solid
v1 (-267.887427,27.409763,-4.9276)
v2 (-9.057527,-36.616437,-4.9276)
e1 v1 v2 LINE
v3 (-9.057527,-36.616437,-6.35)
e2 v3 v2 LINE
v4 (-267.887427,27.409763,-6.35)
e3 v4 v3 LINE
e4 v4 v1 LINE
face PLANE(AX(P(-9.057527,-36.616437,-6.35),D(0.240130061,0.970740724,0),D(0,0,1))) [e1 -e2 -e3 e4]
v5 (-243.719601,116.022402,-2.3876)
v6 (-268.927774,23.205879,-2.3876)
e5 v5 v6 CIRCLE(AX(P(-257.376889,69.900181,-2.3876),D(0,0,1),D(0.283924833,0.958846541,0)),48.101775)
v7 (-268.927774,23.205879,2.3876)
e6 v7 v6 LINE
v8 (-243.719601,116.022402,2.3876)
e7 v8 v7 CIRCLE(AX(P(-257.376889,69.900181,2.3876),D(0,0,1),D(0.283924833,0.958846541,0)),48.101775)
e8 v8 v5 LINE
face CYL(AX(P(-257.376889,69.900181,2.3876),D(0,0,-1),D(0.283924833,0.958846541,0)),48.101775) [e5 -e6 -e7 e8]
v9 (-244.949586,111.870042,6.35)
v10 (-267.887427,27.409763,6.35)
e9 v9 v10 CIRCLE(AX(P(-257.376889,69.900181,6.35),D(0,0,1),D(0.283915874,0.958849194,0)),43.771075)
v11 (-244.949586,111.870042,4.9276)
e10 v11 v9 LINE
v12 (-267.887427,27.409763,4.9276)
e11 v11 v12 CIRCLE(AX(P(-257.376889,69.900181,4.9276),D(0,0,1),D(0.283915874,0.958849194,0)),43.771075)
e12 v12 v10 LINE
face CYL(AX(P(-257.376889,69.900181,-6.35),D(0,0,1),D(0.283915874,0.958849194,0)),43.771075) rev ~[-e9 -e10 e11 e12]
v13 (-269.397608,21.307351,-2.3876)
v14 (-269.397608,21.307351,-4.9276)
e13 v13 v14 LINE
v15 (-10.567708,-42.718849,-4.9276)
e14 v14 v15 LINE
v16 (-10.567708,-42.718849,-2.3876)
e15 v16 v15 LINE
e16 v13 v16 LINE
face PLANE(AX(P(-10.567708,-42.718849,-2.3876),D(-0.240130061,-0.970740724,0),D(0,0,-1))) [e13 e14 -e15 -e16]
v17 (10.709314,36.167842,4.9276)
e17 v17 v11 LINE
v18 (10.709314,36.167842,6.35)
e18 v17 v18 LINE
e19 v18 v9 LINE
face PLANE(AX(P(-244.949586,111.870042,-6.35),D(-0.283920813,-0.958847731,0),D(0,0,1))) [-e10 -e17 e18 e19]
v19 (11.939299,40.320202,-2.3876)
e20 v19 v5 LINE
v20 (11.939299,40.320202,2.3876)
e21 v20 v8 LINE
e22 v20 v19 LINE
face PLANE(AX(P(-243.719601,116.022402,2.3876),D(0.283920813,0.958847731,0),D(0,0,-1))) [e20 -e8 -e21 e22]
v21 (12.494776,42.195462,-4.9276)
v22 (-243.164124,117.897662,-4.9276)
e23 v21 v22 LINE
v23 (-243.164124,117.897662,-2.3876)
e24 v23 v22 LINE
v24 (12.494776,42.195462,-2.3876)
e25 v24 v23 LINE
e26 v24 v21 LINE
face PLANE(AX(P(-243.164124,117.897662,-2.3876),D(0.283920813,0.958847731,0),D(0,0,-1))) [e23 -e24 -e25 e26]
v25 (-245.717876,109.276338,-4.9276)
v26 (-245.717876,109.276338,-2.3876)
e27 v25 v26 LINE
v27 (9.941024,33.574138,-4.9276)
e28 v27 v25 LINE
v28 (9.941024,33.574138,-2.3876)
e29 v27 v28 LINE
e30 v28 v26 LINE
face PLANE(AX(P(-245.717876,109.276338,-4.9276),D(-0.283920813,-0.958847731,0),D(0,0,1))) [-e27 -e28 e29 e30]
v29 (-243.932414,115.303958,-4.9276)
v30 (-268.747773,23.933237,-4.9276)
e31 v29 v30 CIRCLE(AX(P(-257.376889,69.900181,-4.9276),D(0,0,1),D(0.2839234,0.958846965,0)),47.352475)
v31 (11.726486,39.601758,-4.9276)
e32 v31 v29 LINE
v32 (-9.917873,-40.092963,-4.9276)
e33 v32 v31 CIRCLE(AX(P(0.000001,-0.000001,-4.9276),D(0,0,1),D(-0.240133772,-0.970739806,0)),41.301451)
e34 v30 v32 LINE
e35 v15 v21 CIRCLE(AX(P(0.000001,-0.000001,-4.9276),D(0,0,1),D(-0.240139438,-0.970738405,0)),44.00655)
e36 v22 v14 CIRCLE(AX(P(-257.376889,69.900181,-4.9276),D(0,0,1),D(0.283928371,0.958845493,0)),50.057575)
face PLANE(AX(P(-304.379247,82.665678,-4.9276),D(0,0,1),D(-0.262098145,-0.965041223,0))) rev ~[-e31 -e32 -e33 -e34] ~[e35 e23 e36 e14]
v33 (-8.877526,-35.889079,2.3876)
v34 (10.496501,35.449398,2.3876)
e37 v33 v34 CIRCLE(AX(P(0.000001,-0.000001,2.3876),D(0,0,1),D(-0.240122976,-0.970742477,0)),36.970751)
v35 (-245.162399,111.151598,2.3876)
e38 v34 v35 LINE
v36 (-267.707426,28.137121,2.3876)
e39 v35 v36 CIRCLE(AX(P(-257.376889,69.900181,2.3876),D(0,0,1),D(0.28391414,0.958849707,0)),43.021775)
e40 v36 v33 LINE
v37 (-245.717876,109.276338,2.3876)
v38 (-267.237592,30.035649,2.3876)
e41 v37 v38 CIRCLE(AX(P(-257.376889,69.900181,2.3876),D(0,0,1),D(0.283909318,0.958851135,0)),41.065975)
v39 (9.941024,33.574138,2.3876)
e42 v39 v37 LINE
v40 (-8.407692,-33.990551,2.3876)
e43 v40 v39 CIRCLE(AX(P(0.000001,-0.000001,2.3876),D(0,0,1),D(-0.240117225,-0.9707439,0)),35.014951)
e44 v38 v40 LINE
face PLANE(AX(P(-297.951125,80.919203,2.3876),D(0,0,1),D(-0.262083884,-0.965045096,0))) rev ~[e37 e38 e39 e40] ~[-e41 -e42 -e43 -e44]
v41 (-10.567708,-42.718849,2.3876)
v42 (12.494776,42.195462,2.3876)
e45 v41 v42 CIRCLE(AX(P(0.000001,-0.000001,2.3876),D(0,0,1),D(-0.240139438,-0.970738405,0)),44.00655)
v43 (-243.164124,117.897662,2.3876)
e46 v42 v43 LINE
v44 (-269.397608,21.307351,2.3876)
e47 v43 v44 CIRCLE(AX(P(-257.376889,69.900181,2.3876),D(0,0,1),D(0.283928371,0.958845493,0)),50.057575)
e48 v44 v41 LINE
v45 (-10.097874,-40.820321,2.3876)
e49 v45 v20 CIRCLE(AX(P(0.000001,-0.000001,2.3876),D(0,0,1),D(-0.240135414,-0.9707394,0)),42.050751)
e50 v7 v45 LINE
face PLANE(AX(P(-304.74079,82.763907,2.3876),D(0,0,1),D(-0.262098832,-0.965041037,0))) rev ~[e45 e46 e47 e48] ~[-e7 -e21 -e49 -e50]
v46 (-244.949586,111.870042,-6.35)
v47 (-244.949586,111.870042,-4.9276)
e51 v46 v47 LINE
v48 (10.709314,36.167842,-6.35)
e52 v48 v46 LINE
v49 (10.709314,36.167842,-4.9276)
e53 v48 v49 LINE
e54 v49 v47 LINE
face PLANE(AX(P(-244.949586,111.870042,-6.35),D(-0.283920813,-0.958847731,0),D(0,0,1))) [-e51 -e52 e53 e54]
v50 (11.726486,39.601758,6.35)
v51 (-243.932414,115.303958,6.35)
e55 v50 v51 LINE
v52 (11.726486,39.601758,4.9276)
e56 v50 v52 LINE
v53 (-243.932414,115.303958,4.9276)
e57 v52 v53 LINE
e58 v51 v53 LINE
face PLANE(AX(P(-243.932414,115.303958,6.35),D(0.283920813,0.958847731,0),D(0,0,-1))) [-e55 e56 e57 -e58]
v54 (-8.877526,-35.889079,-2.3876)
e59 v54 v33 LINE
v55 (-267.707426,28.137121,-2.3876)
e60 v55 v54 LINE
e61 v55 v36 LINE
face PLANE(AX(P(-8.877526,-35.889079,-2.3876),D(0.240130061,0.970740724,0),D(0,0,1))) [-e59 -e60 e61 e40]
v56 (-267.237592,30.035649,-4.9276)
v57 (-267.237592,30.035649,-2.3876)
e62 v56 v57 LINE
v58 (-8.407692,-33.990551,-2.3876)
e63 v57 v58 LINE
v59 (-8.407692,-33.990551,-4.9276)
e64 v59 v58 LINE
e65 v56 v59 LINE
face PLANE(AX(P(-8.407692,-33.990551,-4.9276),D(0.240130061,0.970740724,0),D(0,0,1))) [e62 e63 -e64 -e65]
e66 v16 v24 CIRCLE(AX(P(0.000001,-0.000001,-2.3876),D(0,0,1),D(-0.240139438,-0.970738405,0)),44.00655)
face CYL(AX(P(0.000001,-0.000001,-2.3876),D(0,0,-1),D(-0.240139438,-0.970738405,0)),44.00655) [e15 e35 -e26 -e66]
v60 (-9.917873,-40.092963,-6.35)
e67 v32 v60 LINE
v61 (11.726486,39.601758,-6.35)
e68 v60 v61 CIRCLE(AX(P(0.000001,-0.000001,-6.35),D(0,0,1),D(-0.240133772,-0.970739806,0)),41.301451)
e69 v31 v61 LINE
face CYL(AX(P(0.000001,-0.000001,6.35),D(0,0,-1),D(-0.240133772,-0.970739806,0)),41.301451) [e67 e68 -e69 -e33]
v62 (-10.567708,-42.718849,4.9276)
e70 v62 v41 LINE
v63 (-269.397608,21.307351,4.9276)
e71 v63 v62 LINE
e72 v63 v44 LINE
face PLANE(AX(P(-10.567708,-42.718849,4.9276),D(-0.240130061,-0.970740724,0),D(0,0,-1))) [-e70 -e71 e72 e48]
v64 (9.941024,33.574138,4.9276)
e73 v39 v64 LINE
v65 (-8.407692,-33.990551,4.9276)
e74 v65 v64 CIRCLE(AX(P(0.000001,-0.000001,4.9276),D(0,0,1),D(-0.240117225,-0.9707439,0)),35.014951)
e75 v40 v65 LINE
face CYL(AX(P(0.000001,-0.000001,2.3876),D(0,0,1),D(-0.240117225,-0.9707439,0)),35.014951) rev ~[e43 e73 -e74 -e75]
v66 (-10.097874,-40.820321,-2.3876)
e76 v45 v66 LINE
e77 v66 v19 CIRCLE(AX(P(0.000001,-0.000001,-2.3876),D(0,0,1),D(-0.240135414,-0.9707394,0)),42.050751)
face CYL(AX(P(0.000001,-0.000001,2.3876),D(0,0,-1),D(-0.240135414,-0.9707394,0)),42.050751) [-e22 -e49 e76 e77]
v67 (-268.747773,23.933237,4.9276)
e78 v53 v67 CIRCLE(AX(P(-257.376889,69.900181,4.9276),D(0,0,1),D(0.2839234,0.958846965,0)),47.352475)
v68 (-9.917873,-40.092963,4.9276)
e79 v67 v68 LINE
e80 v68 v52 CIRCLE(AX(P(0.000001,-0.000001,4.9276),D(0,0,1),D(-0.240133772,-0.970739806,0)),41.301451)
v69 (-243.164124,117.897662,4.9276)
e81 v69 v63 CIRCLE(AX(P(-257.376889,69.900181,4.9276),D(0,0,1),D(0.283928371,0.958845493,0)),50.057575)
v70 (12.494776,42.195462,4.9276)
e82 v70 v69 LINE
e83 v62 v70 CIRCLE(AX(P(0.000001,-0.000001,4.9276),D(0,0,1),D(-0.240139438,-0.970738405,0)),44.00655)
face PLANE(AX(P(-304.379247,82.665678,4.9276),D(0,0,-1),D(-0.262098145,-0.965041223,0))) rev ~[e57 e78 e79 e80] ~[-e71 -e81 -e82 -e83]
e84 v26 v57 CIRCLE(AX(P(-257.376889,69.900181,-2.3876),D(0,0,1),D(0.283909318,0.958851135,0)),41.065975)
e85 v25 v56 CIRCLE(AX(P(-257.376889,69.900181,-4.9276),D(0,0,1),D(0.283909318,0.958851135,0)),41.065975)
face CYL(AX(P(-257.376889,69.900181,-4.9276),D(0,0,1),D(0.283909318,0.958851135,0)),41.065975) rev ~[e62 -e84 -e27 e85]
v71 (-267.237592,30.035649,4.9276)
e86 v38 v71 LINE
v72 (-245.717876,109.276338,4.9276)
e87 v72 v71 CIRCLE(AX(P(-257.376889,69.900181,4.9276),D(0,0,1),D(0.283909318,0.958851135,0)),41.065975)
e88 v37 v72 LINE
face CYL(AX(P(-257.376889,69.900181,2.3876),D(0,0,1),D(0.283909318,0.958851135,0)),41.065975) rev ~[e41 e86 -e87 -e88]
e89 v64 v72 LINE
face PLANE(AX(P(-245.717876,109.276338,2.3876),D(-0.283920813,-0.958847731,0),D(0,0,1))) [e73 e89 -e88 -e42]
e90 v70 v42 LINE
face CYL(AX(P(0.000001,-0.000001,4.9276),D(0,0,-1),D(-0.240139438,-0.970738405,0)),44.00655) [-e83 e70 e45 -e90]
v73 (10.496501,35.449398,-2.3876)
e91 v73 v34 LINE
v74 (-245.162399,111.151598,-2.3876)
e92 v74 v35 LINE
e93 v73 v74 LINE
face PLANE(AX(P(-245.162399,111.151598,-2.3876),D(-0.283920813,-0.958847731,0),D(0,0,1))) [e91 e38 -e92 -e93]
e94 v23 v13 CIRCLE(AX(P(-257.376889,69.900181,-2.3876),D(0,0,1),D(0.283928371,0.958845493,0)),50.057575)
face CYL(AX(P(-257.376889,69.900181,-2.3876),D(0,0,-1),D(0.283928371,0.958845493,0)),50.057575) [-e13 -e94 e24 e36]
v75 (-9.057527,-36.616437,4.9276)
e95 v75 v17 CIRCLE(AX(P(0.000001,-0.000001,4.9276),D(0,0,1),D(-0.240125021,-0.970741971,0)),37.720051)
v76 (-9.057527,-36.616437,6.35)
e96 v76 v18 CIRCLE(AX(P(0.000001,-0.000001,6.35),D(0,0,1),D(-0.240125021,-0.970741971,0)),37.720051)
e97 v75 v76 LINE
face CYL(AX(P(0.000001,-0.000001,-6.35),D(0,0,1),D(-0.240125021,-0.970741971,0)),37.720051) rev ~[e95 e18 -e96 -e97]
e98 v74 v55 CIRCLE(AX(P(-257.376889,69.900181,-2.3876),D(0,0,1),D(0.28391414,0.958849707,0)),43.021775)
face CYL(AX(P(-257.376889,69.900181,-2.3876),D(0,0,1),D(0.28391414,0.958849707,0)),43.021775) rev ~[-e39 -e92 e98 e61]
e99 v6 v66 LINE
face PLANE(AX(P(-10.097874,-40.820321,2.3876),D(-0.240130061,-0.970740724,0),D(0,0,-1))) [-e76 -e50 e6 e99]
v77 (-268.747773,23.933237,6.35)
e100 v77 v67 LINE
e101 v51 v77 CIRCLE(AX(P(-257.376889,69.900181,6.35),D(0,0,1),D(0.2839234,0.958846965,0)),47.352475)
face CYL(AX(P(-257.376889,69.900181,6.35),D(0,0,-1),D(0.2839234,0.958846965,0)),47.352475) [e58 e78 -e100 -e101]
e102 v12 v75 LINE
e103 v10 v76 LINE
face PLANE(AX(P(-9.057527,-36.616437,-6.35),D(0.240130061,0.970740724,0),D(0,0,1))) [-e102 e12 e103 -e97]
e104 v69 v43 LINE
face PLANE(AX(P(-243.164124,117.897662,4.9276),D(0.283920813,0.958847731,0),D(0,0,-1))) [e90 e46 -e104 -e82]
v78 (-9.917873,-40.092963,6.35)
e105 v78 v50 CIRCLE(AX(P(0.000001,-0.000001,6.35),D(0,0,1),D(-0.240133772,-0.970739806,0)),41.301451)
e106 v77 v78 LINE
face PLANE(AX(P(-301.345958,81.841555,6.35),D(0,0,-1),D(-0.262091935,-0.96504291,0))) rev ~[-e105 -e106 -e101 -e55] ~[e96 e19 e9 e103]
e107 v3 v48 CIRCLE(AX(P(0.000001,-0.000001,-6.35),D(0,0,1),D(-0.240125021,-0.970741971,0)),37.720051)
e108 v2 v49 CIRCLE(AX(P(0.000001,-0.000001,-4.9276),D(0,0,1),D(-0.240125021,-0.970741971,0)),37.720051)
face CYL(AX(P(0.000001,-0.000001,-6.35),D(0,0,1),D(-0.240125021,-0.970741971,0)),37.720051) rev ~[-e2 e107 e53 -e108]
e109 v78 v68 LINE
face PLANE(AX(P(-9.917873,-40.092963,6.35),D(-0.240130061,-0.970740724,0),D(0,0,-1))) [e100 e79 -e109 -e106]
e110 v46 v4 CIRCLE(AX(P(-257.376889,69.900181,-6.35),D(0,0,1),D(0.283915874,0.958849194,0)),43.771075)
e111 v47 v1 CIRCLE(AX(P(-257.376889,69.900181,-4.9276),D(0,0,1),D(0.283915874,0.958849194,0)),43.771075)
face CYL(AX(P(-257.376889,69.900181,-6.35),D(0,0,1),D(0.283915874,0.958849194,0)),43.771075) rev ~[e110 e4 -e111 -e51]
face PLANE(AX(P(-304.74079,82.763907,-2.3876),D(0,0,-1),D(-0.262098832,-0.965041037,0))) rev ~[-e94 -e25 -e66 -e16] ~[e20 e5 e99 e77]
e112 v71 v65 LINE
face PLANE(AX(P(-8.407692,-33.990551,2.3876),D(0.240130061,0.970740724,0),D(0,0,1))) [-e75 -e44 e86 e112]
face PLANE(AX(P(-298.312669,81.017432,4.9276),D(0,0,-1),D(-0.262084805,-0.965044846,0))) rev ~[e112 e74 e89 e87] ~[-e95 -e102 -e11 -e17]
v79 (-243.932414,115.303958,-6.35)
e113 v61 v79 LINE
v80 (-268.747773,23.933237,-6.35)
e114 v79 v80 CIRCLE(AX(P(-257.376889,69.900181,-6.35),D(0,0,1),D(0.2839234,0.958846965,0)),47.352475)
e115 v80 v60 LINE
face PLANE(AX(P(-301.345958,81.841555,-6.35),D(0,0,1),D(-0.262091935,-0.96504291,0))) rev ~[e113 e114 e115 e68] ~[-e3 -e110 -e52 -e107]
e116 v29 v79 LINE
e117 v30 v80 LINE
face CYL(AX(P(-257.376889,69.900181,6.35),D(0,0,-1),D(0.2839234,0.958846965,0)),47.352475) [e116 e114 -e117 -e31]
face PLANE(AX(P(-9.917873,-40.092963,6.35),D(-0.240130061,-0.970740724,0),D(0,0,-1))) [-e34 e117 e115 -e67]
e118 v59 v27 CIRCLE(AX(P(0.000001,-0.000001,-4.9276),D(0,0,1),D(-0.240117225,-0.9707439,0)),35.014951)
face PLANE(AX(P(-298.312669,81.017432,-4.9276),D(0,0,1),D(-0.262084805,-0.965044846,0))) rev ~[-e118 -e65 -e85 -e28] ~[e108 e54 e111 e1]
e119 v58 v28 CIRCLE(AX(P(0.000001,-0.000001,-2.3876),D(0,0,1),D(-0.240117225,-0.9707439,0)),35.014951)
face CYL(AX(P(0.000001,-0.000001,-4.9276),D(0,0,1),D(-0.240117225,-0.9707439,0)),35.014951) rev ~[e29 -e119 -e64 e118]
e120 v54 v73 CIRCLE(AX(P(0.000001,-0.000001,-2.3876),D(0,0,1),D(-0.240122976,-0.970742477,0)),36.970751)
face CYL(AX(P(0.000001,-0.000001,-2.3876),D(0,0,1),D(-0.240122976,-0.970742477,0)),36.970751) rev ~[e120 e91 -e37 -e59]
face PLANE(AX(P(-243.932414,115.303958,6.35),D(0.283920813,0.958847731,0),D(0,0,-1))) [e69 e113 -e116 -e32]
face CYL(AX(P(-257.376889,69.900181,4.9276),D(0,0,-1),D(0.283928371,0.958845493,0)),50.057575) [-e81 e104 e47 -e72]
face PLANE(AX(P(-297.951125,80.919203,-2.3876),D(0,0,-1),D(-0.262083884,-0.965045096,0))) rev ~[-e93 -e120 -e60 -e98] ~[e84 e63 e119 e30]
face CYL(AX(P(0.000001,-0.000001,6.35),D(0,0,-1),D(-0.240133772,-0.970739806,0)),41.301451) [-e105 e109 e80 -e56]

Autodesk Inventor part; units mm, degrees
ref_plane "Work Plane2" through (0, 0, 0) normal (-1, 0, 0) x (0, 0, 1)
ref_plane "Work Plane3" through (-257.3769, 69.9002, 0) normal (0.9705533, -0.2408865, 0) x (0, 0, 1)
sketch "Path" plane through (0, 0, 0) normal (0, 0, 1) x (1, 0, 0)
  arc A0 (-9.4877, -38.3547) -> (11.2179, 37.8848) centre (0, 0) ccw
  arc A1 (-244.441, 113.587) -> (-268.3176, 25.6715) centre (-257.3769, 69.9002) ccw
  line L0 (-244.441, 113.587) -> (11.2179, 37.8848)
  line L1 (-9.4877, -38.3547) -> (-268.3176, 25.6715)
  dimension "d31" = 8.9916
ref_plane "Section Plane" through (11.2179, 37.8848, 0) normal (-0.9588478, 0.2839205, 0) x (0, 0, 1)
sketch "Section Sketch" plane through (11.2179, 37.8848, 0) normal (-0.9588478, 0.2839205, 0) x (0, 0, 1)
  line L0 (-6.35, -1.7907) -> (6.35, -1.7907)
  line L1 (6.35, -1.7907) -> (6.35, 1.7907)
  line L2 (6.35, 1.7907) -> (-6.35, 1.7907)
  line L3 (-6.35, 1.7907) -> (-6.35, -1.7907)
  line L4 (-2.3876, -2.54) -> (2.3876, -2.54)
  line L5 (2.3876, -2.54) -> (2.3876, 2.54)
  line L6 (2.3876, 2.54) -> (-2.3876, 2.54)
  line L7 (-2.3876, 2.54) -> (-2.3876, -2.54)
  line L8 (-2.3876, 0) -> (2.3876, 0) construction
  line L9 (-4.9276, -4.4958) -> (-2.3876, -4.4958)
  line L10 (-2.3876, -4.4958) -> (-2.3876, 4.4958)
  line L11 (-2.3876, 4.4958) -> (-4.9276, 4.4958)
  line L12 (-4.9276, 4.4958) -> (-4.9276, -4.4958)
  line L13 (2.3876, -4.4958) -> (4.9276, -4.4958)
  line L14 (4.9276, -4.4958) -> (4.9276, 4.4958)
  line L15 (4.9276, 4.4958) -> (2.3876, 4.4958)
  line L16 (2.3876, 4.4958) -> (2.3876, -4.4958)
  line L17 (-6.35, 0) -> (6.35, 0) construction
  point P0 (0, 0)
  point P1 (0, 0)
  dimension "d21" = 3.5814
  dimension "d22" = 5.08
  dimension "d23" = 4.7752
  dimension "d24" = 2.54
  dimension "d31" = 8.9916
  dimension "d32" = 12.7
sweep "Solid" add profiles "Section Sketch" path "Path"
pattern_of_one "Strand Pattern"
equation "\"d21\" = da_d2"
equation "\"d22\" = da_d1"
equation "\"d23\" = da_b1"
equation "\"d24\" = da_t1 + da_t2"
equation "\"d30\" = da_pt"
equation "\"da_p\" = 9.525"
equation "\"da_b1\" = 4.7752"
equation "\"da_h2\" = 8.9916"
equation "\"da_h3\" = 7.7978"
equation "\"da_d1\" = 5.08"
equation "\"da_d2\" = 3.5814"
equation "\"da_pt\" = 10.1346"
equation "\"da_b\" = 12.7"
equation "\"da_t1\" = 1.27"
equation "\"da_t2\" = 1.27"
properties part number "Roller Chain"
